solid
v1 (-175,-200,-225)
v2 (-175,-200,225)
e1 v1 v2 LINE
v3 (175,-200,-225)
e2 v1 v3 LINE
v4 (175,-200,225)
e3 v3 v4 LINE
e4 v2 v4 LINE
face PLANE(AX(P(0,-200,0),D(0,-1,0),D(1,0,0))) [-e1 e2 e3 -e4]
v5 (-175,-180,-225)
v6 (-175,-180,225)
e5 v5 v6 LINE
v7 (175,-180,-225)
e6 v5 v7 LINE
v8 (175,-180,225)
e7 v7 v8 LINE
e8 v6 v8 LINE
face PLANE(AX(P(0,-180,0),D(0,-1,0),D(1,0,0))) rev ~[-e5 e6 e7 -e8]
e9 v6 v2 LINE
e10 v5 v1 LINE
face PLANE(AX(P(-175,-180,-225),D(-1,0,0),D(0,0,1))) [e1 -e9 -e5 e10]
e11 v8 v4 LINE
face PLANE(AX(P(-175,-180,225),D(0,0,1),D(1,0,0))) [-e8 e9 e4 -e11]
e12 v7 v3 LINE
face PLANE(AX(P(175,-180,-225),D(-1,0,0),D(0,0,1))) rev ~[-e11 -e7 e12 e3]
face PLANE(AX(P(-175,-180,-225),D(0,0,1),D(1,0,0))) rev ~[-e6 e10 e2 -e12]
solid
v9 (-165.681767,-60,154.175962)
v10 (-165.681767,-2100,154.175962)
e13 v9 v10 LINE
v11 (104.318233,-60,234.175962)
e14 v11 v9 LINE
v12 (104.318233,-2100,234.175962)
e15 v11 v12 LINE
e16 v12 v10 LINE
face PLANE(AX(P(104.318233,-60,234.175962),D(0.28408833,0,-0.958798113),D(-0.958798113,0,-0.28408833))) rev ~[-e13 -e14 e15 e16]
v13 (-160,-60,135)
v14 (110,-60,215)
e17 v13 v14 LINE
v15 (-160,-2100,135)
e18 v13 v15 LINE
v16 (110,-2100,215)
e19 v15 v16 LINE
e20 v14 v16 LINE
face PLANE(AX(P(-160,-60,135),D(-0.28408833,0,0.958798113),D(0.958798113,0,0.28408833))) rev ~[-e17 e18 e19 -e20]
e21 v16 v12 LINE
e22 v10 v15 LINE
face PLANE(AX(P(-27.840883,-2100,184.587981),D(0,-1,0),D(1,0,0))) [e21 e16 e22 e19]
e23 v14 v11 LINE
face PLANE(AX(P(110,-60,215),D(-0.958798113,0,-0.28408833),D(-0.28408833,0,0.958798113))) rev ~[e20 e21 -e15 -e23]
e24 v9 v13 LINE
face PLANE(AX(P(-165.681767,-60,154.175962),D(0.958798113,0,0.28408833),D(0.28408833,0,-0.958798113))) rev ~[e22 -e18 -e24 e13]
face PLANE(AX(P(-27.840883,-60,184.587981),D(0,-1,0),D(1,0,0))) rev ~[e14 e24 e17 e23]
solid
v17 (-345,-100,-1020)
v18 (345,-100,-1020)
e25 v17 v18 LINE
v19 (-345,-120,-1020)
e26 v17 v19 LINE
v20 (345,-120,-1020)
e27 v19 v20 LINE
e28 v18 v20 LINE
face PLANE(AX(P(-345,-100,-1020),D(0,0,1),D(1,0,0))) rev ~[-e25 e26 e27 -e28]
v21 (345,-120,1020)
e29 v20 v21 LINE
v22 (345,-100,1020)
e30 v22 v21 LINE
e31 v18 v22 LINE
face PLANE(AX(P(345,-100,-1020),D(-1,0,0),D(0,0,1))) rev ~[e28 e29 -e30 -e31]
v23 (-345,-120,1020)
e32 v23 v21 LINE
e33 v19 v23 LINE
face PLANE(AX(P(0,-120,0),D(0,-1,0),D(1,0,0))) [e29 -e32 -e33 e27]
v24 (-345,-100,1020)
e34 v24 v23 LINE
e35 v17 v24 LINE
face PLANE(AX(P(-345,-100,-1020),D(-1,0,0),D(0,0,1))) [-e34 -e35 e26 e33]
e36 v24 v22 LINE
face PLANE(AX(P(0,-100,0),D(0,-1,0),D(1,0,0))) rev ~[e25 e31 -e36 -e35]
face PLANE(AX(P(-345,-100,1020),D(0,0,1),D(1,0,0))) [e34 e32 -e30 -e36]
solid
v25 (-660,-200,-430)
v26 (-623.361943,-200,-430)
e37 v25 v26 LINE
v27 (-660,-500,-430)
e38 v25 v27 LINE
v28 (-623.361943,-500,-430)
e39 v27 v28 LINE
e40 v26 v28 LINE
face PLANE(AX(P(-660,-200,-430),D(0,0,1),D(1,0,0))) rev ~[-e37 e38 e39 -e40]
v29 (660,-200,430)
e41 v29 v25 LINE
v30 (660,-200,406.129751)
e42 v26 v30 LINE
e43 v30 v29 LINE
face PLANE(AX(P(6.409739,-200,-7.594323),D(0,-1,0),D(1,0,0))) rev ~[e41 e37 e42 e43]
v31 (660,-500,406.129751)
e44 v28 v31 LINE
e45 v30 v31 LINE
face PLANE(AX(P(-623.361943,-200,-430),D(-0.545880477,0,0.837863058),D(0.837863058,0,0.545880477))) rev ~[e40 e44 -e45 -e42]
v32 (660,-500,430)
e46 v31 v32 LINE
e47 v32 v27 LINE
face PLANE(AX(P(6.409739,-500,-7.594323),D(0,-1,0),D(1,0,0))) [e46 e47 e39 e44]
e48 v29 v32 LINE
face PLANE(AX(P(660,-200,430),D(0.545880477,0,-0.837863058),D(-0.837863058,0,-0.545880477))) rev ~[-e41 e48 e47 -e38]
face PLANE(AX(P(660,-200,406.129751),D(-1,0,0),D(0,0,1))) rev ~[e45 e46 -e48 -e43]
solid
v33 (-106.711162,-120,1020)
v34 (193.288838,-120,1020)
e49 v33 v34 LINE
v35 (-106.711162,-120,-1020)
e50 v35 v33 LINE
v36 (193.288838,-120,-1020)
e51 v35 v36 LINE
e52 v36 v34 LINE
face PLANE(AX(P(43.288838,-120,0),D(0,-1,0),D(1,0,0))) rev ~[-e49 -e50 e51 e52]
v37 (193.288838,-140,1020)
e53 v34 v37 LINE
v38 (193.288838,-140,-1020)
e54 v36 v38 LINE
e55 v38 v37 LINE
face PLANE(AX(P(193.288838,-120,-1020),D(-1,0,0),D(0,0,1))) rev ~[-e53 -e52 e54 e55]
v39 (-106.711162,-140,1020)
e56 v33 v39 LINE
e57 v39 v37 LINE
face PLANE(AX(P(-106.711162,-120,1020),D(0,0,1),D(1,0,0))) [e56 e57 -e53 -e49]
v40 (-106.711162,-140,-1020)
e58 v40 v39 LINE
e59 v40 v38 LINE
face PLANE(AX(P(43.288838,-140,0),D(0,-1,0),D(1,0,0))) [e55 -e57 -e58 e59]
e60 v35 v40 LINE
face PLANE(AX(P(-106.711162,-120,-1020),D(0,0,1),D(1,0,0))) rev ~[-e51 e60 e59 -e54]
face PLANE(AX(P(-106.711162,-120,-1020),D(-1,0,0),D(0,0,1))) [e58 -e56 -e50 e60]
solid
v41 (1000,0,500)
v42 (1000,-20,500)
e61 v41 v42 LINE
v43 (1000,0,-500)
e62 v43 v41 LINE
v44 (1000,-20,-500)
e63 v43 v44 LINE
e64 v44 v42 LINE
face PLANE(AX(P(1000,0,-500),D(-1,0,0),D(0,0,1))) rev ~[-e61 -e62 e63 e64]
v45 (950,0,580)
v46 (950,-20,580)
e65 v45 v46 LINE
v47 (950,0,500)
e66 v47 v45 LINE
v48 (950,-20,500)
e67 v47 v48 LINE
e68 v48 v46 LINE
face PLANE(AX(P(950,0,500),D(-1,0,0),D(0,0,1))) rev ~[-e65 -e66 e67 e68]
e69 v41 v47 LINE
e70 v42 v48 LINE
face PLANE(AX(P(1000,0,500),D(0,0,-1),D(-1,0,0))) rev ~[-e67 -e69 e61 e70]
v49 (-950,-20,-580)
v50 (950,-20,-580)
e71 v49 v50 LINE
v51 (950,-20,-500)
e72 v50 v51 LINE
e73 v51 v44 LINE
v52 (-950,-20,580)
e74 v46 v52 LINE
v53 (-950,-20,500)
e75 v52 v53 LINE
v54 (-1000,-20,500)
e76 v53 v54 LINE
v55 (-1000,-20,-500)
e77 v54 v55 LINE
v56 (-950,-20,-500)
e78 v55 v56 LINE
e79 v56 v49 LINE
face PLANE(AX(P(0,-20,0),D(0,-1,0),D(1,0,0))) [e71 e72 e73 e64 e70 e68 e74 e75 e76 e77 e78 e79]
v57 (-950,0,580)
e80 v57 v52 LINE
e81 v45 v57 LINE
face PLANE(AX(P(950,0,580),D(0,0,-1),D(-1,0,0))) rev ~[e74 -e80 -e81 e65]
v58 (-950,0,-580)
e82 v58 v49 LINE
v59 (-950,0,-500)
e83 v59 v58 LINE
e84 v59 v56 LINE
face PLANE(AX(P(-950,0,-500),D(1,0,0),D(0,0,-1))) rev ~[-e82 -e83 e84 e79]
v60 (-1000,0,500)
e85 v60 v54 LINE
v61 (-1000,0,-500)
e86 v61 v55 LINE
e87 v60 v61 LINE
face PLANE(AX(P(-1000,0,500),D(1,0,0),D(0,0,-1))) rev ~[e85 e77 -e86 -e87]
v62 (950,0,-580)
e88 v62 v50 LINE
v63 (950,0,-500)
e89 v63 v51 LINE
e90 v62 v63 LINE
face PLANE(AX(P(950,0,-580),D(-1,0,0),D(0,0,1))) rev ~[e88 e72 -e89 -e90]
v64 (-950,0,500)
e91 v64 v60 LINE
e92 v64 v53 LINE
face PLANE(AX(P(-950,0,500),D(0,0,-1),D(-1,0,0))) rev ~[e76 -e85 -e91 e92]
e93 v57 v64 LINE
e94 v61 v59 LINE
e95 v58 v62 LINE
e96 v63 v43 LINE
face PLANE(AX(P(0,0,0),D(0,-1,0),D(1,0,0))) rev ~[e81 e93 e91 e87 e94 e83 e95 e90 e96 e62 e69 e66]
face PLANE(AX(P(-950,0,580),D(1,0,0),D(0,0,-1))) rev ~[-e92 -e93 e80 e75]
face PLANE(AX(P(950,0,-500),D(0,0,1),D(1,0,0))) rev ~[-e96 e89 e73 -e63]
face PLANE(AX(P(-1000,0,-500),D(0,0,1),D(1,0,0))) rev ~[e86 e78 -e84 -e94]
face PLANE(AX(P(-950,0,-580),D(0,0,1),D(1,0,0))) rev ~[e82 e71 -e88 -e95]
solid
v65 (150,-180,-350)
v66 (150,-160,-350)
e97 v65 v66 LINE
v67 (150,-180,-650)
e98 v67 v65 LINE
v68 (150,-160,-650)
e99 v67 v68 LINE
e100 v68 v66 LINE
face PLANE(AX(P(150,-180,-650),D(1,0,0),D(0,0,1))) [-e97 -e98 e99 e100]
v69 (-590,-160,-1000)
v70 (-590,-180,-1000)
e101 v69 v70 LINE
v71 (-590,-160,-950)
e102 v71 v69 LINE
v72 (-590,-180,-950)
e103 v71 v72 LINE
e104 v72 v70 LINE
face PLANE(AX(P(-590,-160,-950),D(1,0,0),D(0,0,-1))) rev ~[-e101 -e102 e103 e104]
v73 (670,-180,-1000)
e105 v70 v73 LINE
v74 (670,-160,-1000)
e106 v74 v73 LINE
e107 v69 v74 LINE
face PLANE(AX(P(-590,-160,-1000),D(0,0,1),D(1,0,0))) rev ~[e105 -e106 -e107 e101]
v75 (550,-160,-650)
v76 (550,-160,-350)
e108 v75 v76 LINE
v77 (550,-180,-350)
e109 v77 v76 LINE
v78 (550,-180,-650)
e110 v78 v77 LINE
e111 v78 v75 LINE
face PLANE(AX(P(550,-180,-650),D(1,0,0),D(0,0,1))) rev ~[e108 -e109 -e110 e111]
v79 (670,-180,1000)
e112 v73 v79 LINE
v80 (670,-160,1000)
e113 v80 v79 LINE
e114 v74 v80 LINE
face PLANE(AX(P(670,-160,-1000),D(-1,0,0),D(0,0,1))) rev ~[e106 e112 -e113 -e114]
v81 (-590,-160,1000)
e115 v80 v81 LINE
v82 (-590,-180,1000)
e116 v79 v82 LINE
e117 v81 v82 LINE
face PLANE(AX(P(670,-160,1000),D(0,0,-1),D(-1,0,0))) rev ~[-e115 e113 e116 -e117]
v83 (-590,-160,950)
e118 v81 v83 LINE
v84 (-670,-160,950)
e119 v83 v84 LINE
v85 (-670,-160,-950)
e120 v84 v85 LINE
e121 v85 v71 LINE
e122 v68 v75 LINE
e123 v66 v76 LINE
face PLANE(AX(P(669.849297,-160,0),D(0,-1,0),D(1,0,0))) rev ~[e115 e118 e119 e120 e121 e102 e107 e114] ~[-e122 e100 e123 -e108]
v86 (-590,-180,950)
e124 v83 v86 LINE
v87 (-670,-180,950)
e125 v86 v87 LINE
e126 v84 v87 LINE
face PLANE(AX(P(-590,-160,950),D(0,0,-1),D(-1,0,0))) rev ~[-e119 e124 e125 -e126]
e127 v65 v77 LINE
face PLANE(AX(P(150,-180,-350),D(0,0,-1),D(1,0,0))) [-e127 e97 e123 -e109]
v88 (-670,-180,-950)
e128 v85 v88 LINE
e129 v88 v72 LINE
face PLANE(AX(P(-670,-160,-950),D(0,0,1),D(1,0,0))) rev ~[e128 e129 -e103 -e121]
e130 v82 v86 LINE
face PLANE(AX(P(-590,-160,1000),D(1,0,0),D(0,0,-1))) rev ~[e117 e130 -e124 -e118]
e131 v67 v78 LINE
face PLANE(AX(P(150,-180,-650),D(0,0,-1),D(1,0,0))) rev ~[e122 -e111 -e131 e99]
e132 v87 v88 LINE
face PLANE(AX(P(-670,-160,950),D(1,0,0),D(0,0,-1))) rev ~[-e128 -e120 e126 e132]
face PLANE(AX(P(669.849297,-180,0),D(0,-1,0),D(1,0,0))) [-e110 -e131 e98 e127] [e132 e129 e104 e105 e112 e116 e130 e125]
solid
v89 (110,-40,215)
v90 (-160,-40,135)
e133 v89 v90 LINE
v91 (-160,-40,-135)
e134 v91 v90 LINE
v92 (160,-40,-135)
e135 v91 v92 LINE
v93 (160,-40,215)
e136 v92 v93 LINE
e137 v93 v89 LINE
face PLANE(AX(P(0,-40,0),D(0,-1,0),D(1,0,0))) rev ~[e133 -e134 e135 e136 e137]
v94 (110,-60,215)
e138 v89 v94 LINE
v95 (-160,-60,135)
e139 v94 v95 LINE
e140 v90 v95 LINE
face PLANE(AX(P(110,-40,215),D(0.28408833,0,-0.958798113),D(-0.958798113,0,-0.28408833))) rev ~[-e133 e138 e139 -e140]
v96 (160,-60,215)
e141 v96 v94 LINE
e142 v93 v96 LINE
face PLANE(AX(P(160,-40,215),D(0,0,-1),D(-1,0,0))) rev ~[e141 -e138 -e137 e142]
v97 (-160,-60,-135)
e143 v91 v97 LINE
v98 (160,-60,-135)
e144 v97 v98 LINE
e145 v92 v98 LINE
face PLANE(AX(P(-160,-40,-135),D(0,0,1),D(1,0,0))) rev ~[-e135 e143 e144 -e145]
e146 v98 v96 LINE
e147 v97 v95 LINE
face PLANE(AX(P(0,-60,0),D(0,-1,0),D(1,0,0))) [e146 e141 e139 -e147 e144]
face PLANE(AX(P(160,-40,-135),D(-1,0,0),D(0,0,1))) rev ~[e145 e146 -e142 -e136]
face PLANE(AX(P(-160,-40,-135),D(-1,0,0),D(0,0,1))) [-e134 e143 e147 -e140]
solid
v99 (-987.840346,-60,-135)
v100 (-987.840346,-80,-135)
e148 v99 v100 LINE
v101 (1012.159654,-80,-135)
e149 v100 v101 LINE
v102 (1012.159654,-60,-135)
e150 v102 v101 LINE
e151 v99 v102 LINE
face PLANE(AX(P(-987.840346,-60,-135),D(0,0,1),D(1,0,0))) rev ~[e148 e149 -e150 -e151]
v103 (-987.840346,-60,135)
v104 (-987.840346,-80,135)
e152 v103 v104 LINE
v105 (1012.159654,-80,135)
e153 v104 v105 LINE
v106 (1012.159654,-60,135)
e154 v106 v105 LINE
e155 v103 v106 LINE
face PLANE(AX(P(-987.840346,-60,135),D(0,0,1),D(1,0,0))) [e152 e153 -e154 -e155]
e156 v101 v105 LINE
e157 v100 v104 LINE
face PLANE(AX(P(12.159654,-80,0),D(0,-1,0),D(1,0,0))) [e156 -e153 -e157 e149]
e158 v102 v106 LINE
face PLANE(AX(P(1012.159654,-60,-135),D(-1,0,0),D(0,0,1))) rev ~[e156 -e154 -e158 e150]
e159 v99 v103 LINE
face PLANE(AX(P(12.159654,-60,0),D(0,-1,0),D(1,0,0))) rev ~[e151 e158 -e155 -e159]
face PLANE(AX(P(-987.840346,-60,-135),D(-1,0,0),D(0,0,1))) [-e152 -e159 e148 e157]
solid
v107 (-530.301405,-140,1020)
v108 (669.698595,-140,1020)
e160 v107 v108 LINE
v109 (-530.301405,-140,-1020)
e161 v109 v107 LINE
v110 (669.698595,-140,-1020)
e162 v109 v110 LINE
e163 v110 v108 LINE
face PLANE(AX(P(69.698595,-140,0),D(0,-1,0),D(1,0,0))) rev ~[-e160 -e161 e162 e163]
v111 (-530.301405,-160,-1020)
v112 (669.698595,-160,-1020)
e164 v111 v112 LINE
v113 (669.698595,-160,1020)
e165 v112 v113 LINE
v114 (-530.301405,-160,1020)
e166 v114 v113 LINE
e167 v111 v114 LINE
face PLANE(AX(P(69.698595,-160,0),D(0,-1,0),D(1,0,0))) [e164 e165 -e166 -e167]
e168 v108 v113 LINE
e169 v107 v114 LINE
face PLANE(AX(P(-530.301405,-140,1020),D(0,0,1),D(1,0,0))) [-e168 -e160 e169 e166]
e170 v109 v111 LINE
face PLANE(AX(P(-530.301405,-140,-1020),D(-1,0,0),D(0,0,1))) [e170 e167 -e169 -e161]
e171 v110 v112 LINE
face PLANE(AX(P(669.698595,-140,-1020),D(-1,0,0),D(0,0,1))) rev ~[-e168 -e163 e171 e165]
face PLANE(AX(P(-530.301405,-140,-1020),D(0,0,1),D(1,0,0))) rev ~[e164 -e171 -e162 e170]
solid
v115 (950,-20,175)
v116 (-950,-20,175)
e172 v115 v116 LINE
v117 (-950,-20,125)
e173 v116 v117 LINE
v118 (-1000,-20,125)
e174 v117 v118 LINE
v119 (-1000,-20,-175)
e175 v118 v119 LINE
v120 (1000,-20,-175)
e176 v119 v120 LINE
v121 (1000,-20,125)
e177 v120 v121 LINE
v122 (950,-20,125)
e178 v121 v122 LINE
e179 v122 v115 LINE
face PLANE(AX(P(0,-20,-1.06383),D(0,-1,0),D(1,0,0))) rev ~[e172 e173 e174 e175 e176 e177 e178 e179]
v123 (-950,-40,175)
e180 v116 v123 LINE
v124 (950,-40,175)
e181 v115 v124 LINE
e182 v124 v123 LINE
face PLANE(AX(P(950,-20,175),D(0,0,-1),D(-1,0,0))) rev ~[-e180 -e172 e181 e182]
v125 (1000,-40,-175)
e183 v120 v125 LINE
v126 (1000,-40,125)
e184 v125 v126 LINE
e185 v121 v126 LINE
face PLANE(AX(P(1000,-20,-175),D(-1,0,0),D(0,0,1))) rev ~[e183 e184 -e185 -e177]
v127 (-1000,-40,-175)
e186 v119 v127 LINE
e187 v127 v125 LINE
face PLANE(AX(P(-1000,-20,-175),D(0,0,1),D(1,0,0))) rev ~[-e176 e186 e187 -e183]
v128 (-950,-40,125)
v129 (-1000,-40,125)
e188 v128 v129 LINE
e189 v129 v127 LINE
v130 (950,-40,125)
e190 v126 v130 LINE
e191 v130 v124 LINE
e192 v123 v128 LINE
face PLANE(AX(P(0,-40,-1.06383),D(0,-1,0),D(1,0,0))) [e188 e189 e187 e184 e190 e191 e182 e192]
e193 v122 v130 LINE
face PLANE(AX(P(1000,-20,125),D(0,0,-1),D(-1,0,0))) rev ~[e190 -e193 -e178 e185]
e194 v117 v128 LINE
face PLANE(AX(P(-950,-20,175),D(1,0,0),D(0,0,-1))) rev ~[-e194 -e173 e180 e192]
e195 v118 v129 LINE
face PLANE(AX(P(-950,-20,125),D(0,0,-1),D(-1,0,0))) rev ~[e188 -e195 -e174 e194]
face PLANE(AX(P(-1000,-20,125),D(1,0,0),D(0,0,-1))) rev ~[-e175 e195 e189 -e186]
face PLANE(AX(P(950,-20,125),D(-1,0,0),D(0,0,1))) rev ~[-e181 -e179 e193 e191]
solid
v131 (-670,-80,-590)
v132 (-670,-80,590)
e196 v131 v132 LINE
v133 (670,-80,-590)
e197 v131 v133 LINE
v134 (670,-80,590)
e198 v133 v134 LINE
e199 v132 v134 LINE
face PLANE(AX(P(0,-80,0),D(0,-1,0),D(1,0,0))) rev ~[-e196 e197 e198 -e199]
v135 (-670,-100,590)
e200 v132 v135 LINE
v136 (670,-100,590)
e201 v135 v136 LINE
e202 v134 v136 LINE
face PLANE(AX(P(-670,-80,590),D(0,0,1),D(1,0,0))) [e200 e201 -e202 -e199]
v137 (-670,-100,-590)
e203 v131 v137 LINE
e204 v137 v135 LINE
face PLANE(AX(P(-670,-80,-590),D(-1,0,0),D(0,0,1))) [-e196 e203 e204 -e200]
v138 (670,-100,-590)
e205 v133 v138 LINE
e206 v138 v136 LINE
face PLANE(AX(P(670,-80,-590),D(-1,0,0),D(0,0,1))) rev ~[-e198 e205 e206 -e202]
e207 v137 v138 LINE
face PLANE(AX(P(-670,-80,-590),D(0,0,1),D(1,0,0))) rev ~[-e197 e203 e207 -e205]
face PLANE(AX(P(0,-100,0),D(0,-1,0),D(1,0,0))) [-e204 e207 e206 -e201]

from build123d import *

# Parameters (mm, degrees)
F1_DEPTH  = 20
F3_DEPTH  = 20
F4_W      = 320
F4_H      = 270
F5_DEPTH  = 20
F6_W      = 2000
F6_H      = 270
F7_DEPTH  = 20
F9_DEPTH  = 2040
F10_W     = 1340
F10_H     = 1180
F11_DEPTH = 20
F12_W     = 690
F12_H     = 2040
F13_DEPTH = 20
F14_W     = 300
F14_H     = 2040
F15_DEPTH = 20
F16_W     = 1200
F16_H     = 2040
F17_DEPTH = 20
F18_W     = 0.3014054894
F18_H     = 2000
F18_W_2   = 1200
F19_DEPTH = 20
F20_W     = 400
F20_H     = 300
F21_DEPTH = 25
F22_W     = 350
F22_H     = 450
F23_DEPTH = 20
F25_DEPTH = 300


with BuildPart() as f1:
    # F0 (on Front) → F1 (new body)
    with BuildSketch(Plane.XZ):
        Polygon((950, 500), (950, 580), (-950, 580), (-950, 500), (-1000, 500), (-1000, -500), (-950, -500), (-950, -580), (950, -580), (950, -500), (1000, -500), (1000, 500), align=None)
    extrude(amount=F1_DEPTH)


with BuildPart() as f3:
    # F2 (on face) → F3 (new body)
    with BuildSketch(Plane.XZ.offset(20)):
        Polygon((950, 125), (950, 175), (-950, 175), (-950, 125), (-1000, 125), (-1000, -175), (1000, -175), (1000, 125), align=None)
    extrude(amount=F3_DEPTH)


with BuildPart() as f5:
    # F4 (on face) → F5 (new body)
    with BuildSketch(Plane.XZ.offset(40)):
        Rectangle(F4_W, F4_H)
        Polygon((-160, 135), (160, 135), (160, 215), (110, 215), align=None)
    extrude(amount=F5_DEPTH)


with BuildPart() as f7:
    # F6 (on face) → F7 (new body)
    with BuildSketch(Plane.XZ.offset(60)):
        with Locations((12.1596539393, 0)):
            Rectangle(F6_W, F6_H)
    extrude(amount=F7_DEPTH)


with BuildPart() as f9:
    # F8 (on face) → F9 (new body)
    with BuildSketch(Plane.XZ.offset(60)):
        Polygon((-160, 135), (110, 215), (104.3182334062, 234.1759622542), (-165.6817665938, 154.1759622542), align=None)
    extrude(amount=F9_DEPTH)


with BuildPart() as f11:
    # F10 (on face) → F11 (new body)
    with BuildSketch(Plane.XZ.offset(80)):
        Rectangle(F10_W, F10_H)
    extrude(amount=F11_DEPTH)


with BuildPart() as f13:
    # F12 (on face) → F13 (new body)
    with BuildSketch(Plane.XZ.offset(100)):
        Rectangle(F12_W, F12_H)
    extrude(amount=F13_DEPTH)


with BuildPart() as f15:
    # F14 (on face) → F15 (new body)
    with BuildSketch(Plane.XZ.offset(120)):
        with Locations((43.2888381183, 0)):
            Rectangle(F14_W, F14_H)
    extrude(amount=F15_DEPTH)


with BuildPart() as f17:
    # F16 (on face) → F17 (new body)
    with BuildSketch(Plane.XZ.offset(140)):
        with Locations((69.6985945106, 0)):
            Rectangle(F16_W, F16_H)
    extrude(amount=F17_DEPTH)


with BuildPart() as f19:
    # F18 (on face) → F19 (new body)
    with BuildSketch(Plane.XZ.offset(160)):
        with Locations((669.8492972553, 0)):
            Rectangle(F18_W, F18_H)
        Polygon((-530.3014054894, 1000), (-590, 1000), (-590, 950), (-670, 950), (-670, -950), (-590, -950), (-590, -1000), (-530.3014054894, -1000), align=None)
        with Locations((69.6985945106, 0)):
            Rectangle(F18_W_2, F18_H)
    extrude(amount=F19_DEPTH)

    # F20 (on face) → F21 (cut)
    with BuildSketch(Plane.XZ.offset(180)):
        with Locations((350, -500)):
            Rectangle(F20_W, F20_H)
    extrude(amount=-F21_DEPTH, mode=Mode.SUBTRACT)


with BuildPart() as f23:
    # F22 (on face) → F23 (new body)
    with BuildSketch(Plane.XZ.offset(180)):
        Rectangle(F22_W, F22_H)
    extrude(amount=F23_DEPTH)


with BuildPart() as f25:
    # F24 (on face) → F25 (new body)
    with BuildSketch(Plane.XZ.offset(200)):
        Polygon((660, 430), (-660, -430), (-623.3619430822, -430), (660, 406.129750796), align=None)
    extrude(amount=F25_DEPTH)


solid = Compound([f1.part, f3.part, f5.part, f7.part, f9.part, f11.part, f13.part, f15.part, f17.part, f19.part, f23.part, f25.part])
